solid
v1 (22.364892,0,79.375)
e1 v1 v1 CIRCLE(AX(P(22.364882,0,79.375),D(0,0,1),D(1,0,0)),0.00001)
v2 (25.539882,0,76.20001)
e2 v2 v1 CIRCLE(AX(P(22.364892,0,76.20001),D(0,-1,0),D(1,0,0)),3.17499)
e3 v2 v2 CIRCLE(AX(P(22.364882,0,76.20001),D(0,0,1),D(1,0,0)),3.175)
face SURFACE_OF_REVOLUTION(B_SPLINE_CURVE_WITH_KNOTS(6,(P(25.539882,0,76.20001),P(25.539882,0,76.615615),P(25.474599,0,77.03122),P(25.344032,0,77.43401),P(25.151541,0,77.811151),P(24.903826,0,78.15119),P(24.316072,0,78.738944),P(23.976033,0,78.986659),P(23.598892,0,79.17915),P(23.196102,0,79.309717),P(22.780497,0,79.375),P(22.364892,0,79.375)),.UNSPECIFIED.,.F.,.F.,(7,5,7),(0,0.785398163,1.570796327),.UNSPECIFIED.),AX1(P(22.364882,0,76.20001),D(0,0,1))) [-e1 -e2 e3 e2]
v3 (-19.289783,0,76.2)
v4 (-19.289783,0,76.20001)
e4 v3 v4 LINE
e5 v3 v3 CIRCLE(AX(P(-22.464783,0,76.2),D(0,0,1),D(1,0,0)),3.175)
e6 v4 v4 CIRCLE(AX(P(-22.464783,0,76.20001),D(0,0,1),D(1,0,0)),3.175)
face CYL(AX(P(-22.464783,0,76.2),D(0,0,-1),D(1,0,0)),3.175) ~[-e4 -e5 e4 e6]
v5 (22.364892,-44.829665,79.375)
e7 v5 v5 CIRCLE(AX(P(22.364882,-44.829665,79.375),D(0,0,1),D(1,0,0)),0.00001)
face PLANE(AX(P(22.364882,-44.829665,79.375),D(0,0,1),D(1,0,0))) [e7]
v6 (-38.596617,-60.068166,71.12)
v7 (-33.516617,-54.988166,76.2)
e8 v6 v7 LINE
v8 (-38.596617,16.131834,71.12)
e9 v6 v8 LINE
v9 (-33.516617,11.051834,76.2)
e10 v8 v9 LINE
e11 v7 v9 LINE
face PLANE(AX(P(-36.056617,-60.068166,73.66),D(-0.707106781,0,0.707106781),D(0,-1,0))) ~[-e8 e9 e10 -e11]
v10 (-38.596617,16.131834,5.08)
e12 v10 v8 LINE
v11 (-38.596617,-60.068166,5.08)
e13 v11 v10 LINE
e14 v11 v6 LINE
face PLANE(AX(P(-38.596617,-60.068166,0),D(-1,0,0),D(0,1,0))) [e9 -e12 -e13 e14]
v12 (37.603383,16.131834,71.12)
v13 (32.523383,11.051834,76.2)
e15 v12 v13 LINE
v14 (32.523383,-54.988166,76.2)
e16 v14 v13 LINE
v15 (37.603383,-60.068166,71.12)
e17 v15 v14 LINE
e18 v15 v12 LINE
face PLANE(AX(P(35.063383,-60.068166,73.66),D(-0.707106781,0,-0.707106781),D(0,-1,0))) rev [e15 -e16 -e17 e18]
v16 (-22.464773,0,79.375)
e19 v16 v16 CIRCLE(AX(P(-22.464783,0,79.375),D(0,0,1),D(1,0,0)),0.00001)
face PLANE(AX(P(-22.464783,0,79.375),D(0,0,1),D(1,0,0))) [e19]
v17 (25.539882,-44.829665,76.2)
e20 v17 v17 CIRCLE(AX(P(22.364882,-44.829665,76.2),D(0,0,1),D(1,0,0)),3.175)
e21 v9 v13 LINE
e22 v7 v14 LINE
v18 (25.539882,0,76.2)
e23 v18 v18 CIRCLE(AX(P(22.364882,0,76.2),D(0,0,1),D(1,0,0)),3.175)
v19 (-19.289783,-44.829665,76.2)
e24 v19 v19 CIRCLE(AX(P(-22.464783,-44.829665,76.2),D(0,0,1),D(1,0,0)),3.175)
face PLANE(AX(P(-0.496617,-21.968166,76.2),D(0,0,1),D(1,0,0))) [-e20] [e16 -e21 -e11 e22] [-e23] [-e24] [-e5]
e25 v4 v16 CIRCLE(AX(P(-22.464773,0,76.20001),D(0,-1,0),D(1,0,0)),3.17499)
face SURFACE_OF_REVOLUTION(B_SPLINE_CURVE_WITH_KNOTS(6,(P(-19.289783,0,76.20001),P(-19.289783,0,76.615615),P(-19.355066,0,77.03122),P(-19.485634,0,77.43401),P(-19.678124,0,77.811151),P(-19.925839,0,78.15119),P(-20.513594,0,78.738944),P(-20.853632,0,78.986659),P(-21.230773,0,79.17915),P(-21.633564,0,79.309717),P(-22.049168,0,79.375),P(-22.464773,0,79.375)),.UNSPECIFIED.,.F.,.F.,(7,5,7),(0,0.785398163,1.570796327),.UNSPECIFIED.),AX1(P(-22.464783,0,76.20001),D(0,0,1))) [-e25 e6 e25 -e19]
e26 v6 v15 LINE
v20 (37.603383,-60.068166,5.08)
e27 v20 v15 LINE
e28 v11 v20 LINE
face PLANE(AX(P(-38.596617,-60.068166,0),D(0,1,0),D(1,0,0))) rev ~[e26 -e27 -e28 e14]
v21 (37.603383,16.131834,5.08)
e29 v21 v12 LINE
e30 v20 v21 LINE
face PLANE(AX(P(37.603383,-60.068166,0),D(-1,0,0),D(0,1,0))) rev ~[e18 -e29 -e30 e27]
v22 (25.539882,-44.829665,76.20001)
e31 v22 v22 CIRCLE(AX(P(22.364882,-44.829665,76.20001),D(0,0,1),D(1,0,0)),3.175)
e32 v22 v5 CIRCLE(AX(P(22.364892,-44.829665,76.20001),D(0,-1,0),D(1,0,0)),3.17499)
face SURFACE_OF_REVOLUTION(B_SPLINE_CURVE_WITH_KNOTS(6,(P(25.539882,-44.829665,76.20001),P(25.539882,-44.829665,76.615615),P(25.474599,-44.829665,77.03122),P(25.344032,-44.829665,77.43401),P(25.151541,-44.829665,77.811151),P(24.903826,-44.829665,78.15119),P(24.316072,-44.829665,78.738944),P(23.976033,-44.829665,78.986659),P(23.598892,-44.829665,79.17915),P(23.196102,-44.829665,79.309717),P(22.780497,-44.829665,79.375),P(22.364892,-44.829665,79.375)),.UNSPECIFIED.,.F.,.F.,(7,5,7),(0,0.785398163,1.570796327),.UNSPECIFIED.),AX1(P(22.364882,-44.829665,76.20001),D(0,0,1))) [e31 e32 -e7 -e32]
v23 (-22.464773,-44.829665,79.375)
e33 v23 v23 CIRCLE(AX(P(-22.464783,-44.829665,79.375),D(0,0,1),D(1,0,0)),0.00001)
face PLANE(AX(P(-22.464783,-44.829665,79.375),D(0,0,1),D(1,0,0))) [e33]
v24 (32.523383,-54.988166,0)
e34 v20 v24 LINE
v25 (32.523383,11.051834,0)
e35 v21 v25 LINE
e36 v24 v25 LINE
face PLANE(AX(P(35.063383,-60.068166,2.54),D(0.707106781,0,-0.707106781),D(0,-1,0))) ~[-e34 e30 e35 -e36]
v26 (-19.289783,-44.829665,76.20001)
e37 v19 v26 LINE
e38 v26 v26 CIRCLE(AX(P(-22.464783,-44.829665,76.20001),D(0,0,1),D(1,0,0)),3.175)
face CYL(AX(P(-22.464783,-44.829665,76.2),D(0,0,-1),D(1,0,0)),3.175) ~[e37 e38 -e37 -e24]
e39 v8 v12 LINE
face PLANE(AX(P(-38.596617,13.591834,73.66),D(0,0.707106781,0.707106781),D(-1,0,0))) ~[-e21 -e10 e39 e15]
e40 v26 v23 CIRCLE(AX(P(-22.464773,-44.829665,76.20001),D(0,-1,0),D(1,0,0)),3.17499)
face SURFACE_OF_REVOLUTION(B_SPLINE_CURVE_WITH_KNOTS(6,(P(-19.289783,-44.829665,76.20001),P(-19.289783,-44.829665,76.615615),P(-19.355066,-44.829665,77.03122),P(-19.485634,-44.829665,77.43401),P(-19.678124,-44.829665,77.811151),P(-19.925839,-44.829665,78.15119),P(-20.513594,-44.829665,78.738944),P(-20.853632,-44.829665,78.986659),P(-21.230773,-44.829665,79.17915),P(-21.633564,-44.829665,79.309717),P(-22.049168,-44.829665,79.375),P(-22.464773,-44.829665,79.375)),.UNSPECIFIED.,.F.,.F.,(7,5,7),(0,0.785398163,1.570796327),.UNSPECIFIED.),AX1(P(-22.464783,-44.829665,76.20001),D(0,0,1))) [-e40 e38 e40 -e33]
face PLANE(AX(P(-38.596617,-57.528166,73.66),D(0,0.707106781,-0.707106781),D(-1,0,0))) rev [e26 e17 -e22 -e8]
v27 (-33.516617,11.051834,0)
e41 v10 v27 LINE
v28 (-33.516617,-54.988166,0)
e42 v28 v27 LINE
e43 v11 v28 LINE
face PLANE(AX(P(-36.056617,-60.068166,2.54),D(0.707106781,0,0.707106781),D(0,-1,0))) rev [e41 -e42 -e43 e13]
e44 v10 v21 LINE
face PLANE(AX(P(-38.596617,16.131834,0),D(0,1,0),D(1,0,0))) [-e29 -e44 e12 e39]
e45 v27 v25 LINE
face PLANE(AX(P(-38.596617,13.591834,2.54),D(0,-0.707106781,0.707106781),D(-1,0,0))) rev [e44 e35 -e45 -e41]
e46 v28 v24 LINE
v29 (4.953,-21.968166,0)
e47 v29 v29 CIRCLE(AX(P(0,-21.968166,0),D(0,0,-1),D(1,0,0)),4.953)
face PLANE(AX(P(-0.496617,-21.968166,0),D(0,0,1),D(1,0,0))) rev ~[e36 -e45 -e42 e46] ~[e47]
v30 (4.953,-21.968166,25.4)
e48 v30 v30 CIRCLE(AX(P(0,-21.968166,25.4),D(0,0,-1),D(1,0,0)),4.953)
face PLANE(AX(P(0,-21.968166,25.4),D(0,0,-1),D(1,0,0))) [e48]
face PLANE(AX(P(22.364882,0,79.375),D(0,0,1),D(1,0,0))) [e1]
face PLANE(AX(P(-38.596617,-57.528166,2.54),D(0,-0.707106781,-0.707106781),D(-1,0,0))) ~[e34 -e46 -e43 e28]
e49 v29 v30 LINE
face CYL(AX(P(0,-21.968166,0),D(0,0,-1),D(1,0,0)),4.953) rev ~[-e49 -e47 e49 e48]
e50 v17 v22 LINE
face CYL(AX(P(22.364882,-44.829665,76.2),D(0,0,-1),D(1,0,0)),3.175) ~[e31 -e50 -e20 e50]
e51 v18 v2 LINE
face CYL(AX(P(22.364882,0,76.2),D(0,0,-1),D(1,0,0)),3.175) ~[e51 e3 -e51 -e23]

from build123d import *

# Parameters (mm, degrees)
F0_W     = 76.2
F0_H     = 76.2
F1_DEPTH = 76.2
F2_SIZE  = 5.08
F3_R     = 4.953
F4_DEPTH = 25.4
F5_R     = 3.175
F6_DEPTH = 3.175
F7_R     = 3.17499


# Not quite as in the source:
# - a fillet or chamfer is up to 0.001 mm smaller than in the source, because OpenCascade refuses the exact size


with BuildPart() as f1:
    # F0 (on Top) → F1 (new body)
    with BuildSketch(Plane.XY):
        with Locations((-0.4966171047, -21.9681663439)):
            Rectangle(F0_W, F0_H)
    extrude(amount=F1_DEPTH)

    # F2
    f2_edges = [f1.edges().sort_by_distance(p)[0] for p in [
        (-0.496617, -60.068166, 76.2),
        (37.603383, -21.968166, 76.2),
        (-0.496617, 16.131834, 76.2),
        (-38.596617, -21.968166, 76.2),
        (37.603383, -21.968166, 0),
        (-0.496617, -60.068166, 0),
        (-38.596617, -21.968166, 0),
        (-0.496617, 16.131834, 0),
    ]]
    chamfer(f2_edges, length=F2_SIZE)

    # F3 (on face) → F4 (cut)
    with BuildSketch(Plane(origin=(0, 0, 0), x_dir=(1, 0, 0), z_dir=(0, 0, -1))):
        with Locations((0, 21.9681663439)):
            Circle(F3_R)
    extrude(amount=-F4_DEPTH, mode=Mode.SUBTRACT)

    # F5 (on face) → F6 (join)
    with BuildSketch(Plane.XY.offset(76.2)):
        with Locations((-22.4647834486, 0)):
            Circle(F5_R)
        with Locations((22.3648820278, 0)):
            Circle(F5_R)
        with Locations((-22.4647834486, -44.8296654764)):
            Circle(F5_R)
        with Locations((22.3648820278, -44.8296654764)):
            Circle(F5_R)
    extrude(amount=F6_DEPTH)

    # F7 (radius 3.175 in the source; OpenCascade refuses exactly that, so slightly less here)
    f7_edges = [f1.edges().sort_by_distance(p)[0] for p in [
        (-25.639783, -44.829665, 79.375),
        (-25.639783, 0, 79.375),
        (19.189882, 0, 79.375),
        (19.189882, -44.829665, 79.375),
    ]]
    fillet(f7_edges, radius=F7_R)


solid = f1.part
